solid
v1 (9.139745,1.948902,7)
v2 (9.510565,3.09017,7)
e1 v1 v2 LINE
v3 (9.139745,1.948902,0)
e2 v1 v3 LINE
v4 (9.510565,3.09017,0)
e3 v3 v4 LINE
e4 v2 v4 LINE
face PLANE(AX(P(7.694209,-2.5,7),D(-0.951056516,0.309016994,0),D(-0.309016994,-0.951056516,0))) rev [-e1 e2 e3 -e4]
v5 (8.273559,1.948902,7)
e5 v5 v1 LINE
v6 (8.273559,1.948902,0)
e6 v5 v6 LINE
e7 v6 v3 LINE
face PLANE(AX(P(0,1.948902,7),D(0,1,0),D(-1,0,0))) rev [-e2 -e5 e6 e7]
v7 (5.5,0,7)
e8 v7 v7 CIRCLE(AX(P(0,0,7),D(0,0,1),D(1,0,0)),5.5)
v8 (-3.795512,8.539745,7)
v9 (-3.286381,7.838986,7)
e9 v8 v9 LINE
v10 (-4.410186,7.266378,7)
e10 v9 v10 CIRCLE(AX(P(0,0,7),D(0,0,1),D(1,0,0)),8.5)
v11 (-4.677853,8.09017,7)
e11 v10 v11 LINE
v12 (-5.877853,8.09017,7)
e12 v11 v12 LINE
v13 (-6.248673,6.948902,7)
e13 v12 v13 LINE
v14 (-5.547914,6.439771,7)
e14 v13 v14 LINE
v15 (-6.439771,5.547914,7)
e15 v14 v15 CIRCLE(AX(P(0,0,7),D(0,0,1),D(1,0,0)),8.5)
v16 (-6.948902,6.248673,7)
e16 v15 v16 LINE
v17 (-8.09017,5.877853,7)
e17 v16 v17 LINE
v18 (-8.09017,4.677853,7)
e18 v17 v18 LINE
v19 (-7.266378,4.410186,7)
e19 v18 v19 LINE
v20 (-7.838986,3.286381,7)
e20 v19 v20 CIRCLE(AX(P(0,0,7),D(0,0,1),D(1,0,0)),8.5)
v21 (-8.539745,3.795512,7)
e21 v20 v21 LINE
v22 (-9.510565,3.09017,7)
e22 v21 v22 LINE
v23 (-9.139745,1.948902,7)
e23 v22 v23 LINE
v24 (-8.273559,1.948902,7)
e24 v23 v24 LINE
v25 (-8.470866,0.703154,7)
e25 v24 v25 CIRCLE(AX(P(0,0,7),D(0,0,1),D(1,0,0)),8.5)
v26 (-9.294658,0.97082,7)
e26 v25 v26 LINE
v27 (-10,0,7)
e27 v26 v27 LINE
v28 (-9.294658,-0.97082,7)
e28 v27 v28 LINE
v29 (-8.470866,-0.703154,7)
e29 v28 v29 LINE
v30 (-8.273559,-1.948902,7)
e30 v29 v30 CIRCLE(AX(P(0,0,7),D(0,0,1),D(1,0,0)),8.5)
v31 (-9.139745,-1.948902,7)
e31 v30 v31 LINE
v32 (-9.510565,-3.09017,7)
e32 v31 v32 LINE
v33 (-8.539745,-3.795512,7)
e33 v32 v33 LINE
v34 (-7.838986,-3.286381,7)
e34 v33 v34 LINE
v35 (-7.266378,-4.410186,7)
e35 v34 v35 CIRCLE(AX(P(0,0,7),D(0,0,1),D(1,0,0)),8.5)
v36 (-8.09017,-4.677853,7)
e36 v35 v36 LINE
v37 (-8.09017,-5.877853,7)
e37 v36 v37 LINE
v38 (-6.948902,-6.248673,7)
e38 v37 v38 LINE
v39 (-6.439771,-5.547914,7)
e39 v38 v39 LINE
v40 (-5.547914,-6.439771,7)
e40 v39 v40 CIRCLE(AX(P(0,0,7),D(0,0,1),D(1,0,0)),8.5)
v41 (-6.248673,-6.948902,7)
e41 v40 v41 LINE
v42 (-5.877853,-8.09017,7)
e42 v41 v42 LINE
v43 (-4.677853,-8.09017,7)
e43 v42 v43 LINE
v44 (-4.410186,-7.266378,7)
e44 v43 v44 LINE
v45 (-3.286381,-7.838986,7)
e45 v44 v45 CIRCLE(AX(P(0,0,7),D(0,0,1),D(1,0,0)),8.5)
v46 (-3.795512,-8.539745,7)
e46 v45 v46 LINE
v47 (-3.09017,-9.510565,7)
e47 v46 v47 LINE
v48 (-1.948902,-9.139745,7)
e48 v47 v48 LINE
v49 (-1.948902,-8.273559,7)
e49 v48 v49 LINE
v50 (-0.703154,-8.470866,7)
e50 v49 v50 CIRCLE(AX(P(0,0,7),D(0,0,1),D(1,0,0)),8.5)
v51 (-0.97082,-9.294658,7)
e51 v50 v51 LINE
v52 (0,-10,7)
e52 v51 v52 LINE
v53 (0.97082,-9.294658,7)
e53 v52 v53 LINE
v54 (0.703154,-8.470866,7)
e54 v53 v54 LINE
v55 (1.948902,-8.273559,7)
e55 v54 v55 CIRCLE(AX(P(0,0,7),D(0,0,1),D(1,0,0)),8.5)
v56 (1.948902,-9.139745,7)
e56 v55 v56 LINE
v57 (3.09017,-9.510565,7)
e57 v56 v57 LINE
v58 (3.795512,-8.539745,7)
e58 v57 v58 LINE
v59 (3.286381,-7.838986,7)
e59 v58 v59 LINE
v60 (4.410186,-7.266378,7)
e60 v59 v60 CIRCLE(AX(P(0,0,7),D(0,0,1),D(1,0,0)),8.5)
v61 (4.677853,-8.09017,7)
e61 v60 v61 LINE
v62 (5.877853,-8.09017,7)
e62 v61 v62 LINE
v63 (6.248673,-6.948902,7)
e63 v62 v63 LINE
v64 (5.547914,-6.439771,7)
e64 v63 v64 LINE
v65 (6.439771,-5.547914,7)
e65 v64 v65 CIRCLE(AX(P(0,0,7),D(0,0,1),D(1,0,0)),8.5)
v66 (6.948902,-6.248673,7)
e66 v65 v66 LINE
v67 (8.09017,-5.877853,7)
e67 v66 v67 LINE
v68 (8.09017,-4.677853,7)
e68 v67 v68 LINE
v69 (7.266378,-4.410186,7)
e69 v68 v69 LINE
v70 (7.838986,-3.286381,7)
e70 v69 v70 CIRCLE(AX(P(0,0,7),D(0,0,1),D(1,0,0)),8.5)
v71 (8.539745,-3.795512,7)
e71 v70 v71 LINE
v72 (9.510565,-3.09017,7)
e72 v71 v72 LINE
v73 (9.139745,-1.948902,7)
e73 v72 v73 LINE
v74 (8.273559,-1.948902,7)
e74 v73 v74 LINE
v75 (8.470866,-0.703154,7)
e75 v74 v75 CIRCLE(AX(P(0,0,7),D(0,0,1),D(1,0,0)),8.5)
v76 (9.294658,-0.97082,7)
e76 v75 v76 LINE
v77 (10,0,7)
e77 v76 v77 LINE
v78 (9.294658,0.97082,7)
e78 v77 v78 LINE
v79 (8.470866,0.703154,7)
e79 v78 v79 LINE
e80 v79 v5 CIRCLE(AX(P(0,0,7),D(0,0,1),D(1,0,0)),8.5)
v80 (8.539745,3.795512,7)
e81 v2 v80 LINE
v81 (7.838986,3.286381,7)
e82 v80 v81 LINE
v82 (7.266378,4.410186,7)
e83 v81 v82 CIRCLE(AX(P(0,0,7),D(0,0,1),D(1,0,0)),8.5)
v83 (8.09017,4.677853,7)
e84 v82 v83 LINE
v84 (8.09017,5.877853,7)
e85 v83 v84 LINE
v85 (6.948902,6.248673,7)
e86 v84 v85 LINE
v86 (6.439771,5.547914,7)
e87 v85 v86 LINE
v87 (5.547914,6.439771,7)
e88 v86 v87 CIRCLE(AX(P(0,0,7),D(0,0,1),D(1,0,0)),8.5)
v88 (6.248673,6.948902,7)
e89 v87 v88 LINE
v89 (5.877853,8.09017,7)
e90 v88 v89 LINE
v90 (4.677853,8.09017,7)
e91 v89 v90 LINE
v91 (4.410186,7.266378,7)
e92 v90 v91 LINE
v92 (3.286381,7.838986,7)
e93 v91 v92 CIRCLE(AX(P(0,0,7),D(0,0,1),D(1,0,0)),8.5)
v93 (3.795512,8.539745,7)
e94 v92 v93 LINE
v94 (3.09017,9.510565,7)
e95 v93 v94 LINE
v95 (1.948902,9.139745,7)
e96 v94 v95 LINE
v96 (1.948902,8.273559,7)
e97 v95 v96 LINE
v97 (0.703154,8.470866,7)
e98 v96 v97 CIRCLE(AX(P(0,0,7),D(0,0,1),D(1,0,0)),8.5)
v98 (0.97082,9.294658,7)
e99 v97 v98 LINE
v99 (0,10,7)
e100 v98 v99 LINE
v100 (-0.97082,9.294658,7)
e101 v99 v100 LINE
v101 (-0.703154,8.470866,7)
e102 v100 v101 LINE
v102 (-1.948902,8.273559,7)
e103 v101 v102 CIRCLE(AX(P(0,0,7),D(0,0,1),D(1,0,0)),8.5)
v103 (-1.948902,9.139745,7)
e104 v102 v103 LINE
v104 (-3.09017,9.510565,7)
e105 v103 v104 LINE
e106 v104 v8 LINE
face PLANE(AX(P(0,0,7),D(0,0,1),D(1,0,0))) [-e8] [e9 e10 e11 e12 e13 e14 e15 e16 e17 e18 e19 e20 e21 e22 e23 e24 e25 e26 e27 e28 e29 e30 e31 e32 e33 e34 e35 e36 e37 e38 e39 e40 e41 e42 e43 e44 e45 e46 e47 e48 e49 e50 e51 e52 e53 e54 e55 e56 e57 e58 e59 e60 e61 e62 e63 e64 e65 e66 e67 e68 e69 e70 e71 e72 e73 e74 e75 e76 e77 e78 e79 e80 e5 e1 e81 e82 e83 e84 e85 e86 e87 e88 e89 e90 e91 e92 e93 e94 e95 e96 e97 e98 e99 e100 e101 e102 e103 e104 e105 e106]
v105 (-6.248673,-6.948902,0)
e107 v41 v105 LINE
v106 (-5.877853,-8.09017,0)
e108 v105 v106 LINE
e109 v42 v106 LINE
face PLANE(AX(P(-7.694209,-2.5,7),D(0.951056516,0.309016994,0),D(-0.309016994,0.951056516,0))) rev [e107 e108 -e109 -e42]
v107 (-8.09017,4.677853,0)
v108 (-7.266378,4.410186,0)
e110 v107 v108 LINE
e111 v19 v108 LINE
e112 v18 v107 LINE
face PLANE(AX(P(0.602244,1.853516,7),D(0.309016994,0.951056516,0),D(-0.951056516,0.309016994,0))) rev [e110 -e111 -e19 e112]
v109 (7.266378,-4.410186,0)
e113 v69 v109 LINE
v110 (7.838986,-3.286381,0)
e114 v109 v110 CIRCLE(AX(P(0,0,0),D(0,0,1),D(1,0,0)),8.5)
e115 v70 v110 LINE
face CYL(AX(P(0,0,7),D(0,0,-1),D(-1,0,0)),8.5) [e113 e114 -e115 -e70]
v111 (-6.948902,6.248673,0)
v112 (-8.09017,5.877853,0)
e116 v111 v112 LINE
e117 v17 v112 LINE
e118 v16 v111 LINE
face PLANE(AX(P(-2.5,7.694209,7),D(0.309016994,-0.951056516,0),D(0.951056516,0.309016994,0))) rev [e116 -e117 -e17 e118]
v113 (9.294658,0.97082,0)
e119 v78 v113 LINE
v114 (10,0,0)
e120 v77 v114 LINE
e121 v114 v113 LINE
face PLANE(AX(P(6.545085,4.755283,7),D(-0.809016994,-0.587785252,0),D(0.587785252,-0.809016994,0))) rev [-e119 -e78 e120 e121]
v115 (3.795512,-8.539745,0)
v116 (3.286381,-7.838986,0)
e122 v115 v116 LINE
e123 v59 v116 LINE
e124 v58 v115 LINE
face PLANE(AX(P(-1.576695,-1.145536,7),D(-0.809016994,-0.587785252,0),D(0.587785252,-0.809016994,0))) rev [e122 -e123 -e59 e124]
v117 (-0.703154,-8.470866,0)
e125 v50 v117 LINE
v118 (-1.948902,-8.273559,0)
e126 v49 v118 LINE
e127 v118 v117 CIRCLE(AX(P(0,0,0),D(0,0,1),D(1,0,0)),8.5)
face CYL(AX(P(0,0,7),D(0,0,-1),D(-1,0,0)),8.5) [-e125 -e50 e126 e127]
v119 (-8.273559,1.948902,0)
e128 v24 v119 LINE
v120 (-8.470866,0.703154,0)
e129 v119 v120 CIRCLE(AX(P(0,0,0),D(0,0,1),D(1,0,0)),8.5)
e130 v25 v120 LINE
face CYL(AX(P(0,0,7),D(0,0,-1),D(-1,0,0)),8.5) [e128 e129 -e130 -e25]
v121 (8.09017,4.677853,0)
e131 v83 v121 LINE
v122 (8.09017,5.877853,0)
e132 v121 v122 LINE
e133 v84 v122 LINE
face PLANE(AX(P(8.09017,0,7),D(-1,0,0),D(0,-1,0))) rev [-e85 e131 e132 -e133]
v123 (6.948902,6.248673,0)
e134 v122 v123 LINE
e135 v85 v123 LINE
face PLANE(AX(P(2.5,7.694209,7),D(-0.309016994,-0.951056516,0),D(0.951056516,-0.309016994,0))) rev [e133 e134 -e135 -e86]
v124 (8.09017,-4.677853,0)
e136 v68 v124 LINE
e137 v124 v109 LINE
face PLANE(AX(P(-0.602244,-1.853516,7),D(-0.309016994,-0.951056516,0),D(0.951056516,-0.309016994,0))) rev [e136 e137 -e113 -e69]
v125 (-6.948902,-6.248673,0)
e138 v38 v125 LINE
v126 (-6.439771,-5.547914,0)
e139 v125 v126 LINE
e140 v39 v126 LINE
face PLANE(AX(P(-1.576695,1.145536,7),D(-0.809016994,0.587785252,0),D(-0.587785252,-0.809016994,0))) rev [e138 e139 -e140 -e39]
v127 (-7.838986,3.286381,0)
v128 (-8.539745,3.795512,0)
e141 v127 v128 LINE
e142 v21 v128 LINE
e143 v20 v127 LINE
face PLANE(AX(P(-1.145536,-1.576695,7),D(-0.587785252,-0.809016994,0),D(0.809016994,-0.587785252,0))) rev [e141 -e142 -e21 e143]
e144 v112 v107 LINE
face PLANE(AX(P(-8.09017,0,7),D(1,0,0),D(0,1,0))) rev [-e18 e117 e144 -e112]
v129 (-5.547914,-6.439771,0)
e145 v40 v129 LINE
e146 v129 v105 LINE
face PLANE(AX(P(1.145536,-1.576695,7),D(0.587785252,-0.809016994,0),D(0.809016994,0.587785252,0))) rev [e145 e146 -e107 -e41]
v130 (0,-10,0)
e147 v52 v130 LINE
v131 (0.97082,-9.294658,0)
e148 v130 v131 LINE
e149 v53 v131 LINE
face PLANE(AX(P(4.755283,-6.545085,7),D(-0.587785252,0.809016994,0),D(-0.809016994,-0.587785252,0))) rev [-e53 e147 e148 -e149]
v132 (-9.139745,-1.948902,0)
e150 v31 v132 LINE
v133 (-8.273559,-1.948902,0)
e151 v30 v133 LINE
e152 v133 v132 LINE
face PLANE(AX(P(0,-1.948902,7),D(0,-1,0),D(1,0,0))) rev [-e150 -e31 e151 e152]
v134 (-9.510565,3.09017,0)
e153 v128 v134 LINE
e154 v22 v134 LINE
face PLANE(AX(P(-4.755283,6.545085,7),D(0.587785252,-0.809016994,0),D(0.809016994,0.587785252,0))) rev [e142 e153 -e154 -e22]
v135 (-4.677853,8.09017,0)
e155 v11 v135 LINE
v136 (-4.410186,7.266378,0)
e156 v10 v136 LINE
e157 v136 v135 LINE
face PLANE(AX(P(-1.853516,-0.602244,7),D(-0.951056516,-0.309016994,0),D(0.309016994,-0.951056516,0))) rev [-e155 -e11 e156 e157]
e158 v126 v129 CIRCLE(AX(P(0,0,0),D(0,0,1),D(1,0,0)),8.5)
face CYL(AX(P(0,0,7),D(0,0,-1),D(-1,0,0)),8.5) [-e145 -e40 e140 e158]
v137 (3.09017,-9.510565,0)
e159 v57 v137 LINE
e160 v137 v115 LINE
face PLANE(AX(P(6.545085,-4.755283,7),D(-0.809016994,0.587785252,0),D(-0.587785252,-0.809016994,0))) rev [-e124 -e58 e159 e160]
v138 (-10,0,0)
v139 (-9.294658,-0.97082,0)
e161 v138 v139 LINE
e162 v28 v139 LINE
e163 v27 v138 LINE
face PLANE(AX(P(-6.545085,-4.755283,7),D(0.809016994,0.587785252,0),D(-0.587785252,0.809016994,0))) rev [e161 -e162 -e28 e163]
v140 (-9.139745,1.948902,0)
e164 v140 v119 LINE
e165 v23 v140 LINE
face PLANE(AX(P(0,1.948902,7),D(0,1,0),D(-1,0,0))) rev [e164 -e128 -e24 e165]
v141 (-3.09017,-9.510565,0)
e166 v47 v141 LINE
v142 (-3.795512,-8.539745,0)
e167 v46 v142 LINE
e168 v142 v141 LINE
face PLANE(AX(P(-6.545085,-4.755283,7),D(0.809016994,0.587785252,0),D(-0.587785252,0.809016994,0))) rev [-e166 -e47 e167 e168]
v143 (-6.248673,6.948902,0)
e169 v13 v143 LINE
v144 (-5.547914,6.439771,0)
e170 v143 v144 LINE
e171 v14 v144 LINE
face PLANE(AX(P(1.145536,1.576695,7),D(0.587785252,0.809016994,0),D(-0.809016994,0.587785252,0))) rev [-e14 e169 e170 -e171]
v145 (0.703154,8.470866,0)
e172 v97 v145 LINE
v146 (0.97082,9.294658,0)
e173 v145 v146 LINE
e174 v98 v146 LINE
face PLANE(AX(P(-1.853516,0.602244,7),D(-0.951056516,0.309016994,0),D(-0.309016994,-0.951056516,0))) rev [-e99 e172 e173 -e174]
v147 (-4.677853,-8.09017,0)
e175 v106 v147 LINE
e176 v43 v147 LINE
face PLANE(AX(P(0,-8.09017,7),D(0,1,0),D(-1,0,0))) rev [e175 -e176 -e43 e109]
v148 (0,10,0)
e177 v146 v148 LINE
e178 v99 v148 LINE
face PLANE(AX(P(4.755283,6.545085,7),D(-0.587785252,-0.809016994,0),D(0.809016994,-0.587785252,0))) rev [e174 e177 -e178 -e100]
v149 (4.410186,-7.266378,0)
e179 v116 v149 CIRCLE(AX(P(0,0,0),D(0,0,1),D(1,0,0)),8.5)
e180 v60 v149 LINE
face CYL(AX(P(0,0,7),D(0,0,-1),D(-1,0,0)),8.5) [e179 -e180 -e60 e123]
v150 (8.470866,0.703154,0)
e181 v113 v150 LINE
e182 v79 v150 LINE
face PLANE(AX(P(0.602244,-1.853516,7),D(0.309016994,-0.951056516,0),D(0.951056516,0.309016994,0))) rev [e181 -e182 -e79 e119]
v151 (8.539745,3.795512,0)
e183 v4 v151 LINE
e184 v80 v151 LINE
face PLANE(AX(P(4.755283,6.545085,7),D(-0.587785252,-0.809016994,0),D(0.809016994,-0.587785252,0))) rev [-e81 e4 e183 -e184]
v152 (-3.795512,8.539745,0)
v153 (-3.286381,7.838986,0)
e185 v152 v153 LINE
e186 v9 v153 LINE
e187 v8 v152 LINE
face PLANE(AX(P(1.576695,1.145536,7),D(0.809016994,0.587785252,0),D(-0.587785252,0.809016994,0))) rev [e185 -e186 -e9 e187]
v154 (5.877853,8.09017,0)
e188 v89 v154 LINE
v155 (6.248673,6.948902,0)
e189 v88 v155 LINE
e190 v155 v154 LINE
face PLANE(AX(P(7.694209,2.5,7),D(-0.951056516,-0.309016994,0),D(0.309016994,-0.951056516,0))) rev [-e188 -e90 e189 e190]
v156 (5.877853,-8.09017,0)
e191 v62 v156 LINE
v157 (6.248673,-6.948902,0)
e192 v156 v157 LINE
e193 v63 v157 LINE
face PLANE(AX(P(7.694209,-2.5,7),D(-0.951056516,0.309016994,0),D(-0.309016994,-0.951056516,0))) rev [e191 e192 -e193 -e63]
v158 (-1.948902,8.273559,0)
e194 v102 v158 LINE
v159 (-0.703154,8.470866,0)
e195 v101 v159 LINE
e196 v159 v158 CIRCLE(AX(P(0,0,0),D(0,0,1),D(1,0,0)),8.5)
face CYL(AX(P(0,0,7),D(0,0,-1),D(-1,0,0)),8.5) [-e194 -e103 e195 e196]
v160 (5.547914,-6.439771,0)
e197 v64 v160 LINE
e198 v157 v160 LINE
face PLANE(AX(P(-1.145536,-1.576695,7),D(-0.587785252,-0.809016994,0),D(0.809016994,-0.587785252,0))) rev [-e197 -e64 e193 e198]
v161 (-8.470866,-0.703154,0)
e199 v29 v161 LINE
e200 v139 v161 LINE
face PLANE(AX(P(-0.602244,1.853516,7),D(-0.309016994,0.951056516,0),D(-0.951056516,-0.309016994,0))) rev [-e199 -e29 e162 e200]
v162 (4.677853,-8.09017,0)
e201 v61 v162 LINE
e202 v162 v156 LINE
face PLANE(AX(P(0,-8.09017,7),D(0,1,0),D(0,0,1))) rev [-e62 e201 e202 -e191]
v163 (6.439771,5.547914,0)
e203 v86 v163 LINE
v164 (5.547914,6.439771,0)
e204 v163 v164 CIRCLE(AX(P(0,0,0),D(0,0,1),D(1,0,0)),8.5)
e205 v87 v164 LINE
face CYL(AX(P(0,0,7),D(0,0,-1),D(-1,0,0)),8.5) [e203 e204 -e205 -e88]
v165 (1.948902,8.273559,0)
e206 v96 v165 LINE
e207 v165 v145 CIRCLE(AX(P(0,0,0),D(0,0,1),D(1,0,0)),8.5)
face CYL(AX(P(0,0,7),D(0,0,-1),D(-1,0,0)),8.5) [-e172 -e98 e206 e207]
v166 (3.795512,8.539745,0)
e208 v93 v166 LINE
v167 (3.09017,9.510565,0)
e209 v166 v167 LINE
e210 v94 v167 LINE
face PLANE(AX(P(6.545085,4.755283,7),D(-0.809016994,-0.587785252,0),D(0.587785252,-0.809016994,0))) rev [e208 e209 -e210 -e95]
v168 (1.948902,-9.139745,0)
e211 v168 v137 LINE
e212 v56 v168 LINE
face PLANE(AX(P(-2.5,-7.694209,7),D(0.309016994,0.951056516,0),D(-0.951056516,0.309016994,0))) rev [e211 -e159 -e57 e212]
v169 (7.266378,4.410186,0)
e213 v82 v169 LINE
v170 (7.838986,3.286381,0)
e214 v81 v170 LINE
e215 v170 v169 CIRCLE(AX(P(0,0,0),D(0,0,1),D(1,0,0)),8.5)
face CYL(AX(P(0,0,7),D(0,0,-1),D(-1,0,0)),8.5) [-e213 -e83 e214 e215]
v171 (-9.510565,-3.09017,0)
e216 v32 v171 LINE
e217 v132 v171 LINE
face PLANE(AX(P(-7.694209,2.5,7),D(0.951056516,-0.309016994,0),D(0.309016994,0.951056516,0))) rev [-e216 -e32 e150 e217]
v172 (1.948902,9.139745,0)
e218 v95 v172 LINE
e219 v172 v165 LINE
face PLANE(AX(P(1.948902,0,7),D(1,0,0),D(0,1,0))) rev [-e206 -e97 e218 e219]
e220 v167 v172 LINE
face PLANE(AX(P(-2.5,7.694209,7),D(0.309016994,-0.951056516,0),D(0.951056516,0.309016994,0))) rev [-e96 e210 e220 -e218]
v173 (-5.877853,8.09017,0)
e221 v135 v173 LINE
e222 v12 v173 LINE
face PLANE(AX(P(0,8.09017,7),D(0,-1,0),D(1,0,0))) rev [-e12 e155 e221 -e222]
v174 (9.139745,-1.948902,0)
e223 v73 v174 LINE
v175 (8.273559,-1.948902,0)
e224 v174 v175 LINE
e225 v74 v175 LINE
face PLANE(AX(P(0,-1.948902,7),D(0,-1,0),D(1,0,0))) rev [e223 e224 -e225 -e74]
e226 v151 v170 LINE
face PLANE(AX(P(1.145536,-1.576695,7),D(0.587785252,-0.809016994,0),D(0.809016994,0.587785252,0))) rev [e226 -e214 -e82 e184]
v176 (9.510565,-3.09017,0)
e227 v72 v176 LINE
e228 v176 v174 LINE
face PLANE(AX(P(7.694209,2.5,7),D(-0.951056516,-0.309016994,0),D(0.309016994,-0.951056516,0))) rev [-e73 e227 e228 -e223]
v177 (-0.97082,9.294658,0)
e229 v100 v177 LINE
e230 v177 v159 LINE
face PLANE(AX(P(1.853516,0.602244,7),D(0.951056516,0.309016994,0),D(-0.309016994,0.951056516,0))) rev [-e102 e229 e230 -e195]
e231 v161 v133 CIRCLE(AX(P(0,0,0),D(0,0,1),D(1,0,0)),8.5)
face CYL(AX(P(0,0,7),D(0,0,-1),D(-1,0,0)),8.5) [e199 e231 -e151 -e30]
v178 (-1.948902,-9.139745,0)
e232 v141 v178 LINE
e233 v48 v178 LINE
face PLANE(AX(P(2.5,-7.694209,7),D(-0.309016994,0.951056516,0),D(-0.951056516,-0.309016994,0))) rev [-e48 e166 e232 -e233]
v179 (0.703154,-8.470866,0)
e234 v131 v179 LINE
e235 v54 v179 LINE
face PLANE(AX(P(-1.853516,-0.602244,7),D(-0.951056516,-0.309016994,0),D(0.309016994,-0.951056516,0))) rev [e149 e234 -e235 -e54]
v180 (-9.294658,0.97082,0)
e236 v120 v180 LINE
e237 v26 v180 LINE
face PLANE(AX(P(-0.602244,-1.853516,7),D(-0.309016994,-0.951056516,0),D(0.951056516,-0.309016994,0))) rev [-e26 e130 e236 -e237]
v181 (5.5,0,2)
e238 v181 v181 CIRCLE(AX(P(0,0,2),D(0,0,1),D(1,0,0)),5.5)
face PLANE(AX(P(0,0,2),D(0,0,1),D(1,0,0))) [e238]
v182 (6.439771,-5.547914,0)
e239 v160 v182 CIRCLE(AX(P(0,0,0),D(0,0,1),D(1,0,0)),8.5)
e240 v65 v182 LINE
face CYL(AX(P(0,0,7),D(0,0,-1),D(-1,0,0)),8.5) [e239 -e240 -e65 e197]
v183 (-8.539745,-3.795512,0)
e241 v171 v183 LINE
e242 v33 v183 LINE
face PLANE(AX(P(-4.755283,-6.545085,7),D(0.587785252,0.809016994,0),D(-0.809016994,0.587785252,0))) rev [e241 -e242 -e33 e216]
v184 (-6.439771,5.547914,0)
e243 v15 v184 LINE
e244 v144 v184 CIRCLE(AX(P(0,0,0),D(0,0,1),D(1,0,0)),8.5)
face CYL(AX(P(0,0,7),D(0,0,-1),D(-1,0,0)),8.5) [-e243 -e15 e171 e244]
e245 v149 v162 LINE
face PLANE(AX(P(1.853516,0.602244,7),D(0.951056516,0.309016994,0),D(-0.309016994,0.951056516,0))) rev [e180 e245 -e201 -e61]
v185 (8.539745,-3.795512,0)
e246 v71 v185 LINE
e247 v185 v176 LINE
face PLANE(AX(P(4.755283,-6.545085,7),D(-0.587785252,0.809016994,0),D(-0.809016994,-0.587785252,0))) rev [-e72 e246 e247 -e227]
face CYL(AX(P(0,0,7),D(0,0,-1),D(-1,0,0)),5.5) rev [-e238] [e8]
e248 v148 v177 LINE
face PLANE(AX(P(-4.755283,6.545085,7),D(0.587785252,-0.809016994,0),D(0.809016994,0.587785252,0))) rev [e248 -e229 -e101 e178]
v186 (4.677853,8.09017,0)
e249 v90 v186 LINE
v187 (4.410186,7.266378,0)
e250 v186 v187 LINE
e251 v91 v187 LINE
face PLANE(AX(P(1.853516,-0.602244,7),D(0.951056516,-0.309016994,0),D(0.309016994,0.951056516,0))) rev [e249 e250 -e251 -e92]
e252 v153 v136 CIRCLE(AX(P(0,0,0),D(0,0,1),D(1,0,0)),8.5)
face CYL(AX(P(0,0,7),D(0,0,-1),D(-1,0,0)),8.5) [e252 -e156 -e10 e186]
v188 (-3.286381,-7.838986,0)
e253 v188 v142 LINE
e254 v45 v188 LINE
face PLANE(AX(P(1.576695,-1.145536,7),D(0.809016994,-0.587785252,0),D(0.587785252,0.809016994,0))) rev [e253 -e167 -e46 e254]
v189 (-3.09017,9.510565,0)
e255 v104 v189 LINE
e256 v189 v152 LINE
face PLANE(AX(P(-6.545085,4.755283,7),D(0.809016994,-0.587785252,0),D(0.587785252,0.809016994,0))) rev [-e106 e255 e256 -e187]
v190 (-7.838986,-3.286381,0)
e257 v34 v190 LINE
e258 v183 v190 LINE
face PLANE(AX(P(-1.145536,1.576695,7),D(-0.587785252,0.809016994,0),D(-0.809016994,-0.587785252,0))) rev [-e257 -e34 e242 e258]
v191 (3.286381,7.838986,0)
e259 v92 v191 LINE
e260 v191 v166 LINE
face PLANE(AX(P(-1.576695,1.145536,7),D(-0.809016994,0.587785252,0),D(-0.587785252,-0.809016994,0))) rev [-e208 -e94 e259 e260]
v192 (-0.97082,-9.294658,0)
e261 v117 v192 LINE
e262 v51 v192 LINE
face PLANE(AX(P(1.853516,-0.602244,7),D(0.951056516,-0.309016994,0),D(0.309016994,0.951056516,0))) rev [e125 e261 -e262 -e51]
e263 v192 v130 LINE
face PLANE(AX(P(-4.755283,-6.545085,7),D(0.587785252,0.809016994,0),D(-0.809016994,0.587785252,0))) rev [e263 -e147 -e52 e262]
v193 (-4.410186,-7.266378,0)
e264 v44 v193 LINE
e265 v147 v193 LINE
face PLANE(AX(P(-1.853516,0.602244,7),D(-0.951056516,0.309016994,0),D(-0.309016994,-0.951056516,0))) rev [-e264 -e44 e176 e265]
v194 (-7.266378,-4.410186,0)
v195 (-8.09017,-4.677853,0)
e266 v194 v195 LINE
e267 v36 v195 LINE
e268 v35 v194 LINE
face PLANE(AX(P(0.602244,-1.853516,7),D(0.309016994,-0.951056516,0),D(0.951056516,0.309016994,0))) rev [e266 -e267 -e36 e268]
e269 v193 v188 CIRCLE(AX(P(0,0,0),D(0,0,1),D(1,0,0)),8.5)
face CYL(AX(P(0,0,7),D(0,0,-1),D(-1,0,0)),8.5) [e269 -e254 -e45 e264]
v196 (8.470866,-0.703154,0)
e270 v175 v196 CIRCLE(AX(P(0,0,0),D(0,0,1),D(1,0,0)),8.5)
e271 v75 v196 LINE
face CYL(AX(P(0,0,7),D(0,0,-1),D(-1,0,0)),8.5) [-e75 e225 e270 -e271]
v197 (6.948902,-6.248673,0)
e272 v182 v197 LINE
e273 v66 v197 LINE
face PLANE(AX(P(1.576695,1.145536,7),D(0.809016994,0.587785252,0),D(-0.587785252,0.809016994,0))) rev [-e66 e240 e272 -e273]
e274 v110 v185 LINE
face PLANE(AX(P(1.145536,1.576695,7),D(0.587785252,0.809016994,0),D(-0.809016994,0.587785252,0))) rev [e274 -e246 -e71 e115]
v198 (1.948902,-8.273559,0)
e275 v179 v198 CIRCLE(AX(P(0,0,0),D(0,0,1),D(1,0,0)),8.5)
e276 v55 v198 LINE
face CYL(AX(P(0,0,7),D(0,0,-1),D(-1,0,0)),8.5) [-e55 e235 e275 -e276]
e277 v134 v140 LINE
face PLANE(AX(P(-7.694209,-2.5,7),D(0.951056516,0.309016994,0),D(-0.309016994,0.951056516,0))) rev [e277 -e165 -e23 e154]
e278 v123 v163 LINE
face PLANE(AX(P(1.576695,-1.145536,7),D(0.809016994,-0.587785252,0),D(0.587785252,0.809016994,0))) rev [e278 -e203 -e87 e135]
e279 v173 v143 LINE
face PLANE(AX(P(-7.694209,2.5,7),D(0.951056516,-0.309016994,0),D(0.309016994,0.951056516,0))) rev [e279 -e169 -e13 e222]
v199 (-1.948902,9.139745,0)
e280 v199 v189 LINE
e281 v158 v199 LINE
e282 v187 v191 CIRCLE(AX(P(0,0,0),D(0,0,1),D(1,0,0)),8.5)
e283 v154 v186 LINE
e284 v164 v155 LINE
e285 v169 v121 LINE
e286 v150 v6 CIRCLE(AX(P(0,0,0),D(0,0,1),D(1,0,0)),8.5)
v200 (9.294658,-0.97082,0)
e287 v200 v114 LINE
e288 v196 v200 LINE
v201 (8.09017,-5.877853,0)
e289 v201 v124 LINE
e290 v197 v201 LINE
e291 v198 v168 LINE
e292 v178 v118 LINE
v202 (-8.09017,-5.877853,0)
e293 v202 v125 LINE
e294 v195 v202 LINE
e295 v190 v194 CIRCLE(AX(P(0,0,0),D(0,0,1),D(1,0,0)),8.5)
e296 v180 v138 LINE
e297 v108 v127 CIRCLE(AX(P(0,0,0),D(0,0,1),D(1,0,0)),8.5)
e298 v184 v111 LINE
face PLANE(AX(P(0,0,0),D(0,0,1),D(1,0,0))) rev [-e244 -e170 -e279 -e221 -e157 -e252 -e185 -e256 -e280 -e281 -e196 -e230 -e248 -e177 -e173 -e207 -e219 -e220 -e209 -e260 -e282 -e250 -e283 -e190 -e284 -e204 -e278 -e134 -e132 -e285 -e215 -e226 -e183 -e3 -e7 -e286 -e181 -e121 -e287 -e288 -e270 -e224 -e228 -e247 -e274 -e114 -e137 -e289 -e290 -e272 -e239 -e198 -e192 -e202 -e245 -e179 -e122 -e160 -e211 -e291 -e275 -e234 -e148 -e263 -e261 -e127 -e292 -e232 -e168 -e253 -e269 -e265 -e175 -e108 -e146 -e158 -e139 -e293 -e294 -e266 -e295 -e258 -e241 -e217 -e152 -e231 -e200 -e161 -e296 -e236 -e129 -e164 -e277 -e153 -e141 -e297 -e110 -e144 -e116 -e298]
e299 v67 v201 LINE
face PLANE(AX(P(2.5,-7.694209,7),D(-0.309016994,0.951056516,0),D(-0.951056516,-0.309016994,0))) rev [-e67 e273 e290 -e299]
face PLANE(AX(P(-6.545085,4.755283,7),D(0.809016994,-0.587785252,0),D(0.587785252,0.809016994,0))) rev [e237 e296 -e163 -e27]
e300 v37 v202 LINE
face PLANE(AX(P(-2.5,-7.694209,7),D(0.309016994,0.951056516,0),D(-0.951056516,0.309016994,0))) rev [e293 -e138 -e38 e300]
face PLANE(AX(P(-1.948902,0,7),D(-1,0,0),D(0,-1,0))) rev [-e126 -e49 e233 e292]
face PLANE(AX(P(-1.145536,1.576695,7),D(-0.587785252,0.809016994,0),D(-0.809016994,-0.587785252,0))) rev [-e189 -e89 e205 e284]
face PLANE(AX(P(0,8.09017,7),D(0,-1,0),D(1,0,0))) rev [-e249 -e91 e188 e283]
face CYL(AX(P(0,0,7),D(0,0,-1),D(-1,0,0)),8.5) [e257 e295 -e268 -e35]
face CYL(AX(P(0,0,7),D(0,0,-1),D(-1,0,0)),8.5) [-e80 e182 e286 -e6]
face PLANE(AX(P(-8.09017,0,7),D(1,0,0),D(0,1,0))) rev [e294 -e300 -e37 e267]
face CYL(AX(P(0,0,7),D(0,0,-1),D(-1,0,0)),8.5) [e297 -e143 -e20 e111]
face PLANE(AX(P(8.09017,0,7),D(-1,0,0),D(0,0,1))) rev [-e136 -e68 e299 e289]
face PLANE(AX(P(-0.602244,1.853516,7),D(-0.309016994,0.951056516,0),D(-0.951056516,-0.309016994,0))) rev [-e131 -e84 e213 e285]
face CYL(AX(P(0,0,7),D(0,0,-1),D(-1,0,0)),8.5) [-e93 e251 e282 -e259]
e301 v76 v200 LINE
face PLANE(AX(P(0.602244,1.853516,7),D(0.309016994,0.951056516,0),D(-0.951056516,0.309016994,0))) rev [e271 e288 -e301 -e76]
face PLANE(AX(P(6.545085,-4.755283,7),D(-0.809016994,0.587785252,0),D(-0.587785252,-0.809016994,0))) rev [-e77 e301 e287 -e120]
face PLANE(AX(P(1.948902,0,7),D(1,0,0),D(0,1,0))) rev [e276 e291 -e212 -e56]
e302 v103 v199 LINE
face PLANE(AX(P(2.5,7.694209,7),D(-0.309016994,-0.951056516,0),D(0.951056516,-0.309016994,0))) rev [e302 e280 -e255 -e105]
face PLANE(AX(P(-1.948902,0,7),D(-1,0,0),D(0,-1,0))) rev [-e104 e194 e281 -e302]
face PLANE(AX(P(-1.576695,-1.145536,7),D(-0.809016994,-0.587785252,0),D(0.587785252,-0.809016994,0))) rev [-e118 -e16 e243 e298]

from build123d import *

# Parameters (mm, degrees)
BOSS_EXTRUDE1_OUTLINE_R = 5.5
BOSS_EXTRUDE1_DEPTH     = 7
SKETCH1_3_R             = 5.5
BOSS_EXTRUDE2_DEPTH     = 2


# Read off the part's stored shape, not the designer's step: Boss-Extrude1
with BuildPart() as part:
    # Boss-Extrude1 outline → Boss-Extrude1 (new body)
    with BuildSketch(Plane.XY):
        with BuildLine():
            Line((-0.970820393, 9.294657697), (-0.703154307, 8.470866191))
            ThreePointArc((-0.703154307, 8.470866191), (-1.329692953, 8.395350895), (-1.948902124, 8.27355912))
            Line((-1.948902124, 8.27355912), (-1.948902124, 9.13974477))
            Line((-1.948902124, 9.13974477), (-3.090169944, 9.510565163))
            Line((-3.090169944, 9.510565163), (-3.795512247, 8.53974477))
            Line((-3.795512247, 8.53974477), (-3.286381096, 7.838985859))
            ThreePointArc((-3.286381096, 7.838985859), (-3.858919248, 7.573555456), (-4.410186437, 7.266378437))
            Line((-4.410186437, 7.266378437), (-4.677852523, 8.090169944))
            Line((-4.677852523, 8.090169944), (-5.877852523, 8.090169944))
            Line((-5.877852523, 8.090169944), (-6.248672916, 6.948902124))
            Line((-6.248672916, 6.948902124), (-5.547914005, 6.439770973))
            ThreePointArc((-5.547914005, 6.439770973), (-6.01040764, 6.01040764), (-6.439770973, 5.547914005))
            Line((-6.439770973, 5.547914005), (-6.948902124, 6.248672916))
            Line((-6.948902124, 6.248672916), (-8.090169944, 5.877852523))
            Line((-8.090169944, 5.877852523), (-8.090169944, 4.677852523))
            Line((-8.090169944, 4.677852523), (-7.266378437, 4.410186437))
            ThreePointArc((-7.266378437, 4.410186437), (-7.573555456, 3.858919248), (-7.838985859, 3.286381096))
            Line((-7.838985859, 3.286381096), (-8.53974477, 3.795512246))
            Line((-8.53974477, 3.795512246), (-9.510565163, 3.090169944))
            Line((-9.510565163, 3.090169944), (-9.13974477, 1.948902124))
            Line((-9.13974477, 1.948902124), (-8.27355912, 1.948902124))
            ThreePointArc((-8.27355912, 1.948902124), (-8.395350895, 1.329692953), (-8.470866191, 0.703154307))
            Line((-8.470866191, 0.703154307), (-9.294657697, 0.970820393))
            Line((-9.294657697, 0.970820393), (-10, 0))
            Line((-10, 0), (-9.294657697, -0.970820393))
            Line((-9.294657697, -0.970820393), (-8.470866191, -0.703154307))
            ThreePointArc((-8.470866191, -0.703154307), (-8.395350895, -1.329692953), (-8.27355912, -1.948902124))
            Line((-8.27355912, -1.948902124), (-9.13974477, -1.948902124))
            Line((-9.13974477, -1.948902124), (-9.510565163, -3.090169944))
            Line((-9.510565163, -3.090169944), (-8.53974477, -3.795512247))
            Line((-8.53974477, -3.795512247), (-7.838985859, -3.286381096))
            ThreePointArc((-7.838985859, -3.286381096), (-7.573555456, -3.858919248), (-7.266378437, -4.410186437))
            Line((-7.266378437, -4.410186437), (-8.090169944, -4.677852523))
            Line((-8.090169944, -4.677852523), (-8.090169944, -5.877852523))
            Line((-8.090169944, -5.877852523), (-6.948902124, -6.248672916))
            Line((-6.948902124, -6.248672916), (-6.439770973, -5.547914005))
            ThreePointArc((-6.439770973, -5.547914005), (-6.01040764, -6.01040764), (-5.547914005, -6.439770973))
            Line((-5.547914005, -6.439770973), (-6.248672916, -6.948902124))
            Line((-6.248672916, -6.948902124), (-5.877852523, -8.090169944))
            Line((-5.877852523, -8.090169944), (-4.677852523, -8.090169944))
            Line((-4.677852523, -8.090169944), (-4.410186437, -7.266378437))
            ThreePointArc((-4.410186437, -7.266378437), (-3.858919248, -7.573555456), (-3.286381096, -7.838985859))
            Line((-3.286381096, -7.838985859), (-3.795512246, -8.53974477))
            Line((-3.795512246, -8.53974477), (-3.090169944, -9.510565163))
            Line((-3.090169944, -9.510565163), (-1.948902124, -9.13974477))
            Line((-1.948902124, -9.13974477), (-1.948902124, -8.27355912))
            ThreePointArc((-1.948902124, -8.27355912), (-1.329692953, -8.395350895), (-0.703154307, -8.470866191))
            Line((-0.703154307, -8.470866191), (-0.970820393, -9.294657697))
            Line((-0.970820393, -9.294657697), (0, -10))
            Line((0, -10), (0.970820393, -9.294657697))
            Line((0.970820393, -9.294657697), (0.703154307, -8.470866191))
            ThreePointArc((0.703154307, -8.470866191), (1.329692953, -8.395350895), (1.948902124, -8.27355912))
            Line((1.948902124, -8.27355912), (1.948902124, -9.13974477))
            Line((1.948902124, -9.13974477), (3.090169944, -9.510565163))
            Line((3.090169944, -9.510565163), (3.795512247, -8.53974477))
            Line((3.795512247, -8.53974477), (3.286381096, -7.838985859))
            ThreePointArc((3.286381096, -7.838985859), (3.858919248, -7.573555456), (4.410186437, -7.266378437))
            Line((4.410186437, -7.266378437), (4.677852523, -8.090169944))
            Line((4.677852523, -8.090169944), (5.877852523, -8.090169944))
            Line((5.877852523, -8.090169944), (6.248672916, -6.948902124))
            Line((6.248672916, -6.948902124), (5.547914005, -6.439770973))
            ThreePointArc((5.547914005, -6.439770973), (6.01040764, -6.01040764), (6.439770973, -5.547914005))
            Line((6.439770973, -5.547914005), (6.948902124, -6.248672916))
            Line((6.948902124, -6.248672916), (8.090169944, -5.877852523))
            Line((8.090169944, -5.877852523), (8.090169944, -4.677852523))
            Line((8.090169944, -4.677852523), (7.266378437, -4.410186437))
            ThreePointArc((7.266378437, -4.410186437), (7.573555456, -3.858919248), (7.838985859, -3.286381096))
            Line((7.838985859, -3.286381096), (8.53974477, -3.795512246))
            Line((8.53974477, -3.795512246), (9.510565163, -3.090169944))
            Line((9.510565163, -3.090169944), (9.13974477, -1.948902124))
            Line((9.13974477, -1.948902124), (8.27355912, -1.948902124))
            ThreePointArc((8.27355912, -1.948902124), (8.395350895, -1.329692953), (8.470866191, -0.703154307))
            Line((8.470866191, -0.703154307), (9.294657697, -0.970820393))
            Line((9.294657697, -0.970820393), (10, 0))
            Line((10, 0), (9.294657697, 0.970820393))
            Line((9.294657697, 0.970820393), (8.470866191, 0.703154307))
            ThreePointArc((8.470866191, 0.703154307), (8.395350895, 1.329692953), (8.27355912, 1.948902124))
            Line((8.27355912, 1.948902124), (9.13974477, 1.948902124))
            Line((9.13974477, 1.948902124), (9.510565163, 3.090169944))
            Line((9.510565163, 3.090169944), (8.53974477, 3.795512247))
            Line((8.53974477, 3.795512247), (7.838985859, 3.286381096))
            ThreePointArc((7.838985859, 3.286381096), (7.573555456, 3.858919248), (7.266378437, 4.410186437))
            Line((7.266378437, 4.410186437), (8.090169944, 4.677852523))
            Line((8.090169944, 4.677852523), (8.090169944, 5.877852523))
            Line((8.090169944, 5.877852523), (6.948902124, 6.248672916))
            Line((6.948902124, 6.248672916), (6.439770973, 5.547914005))
            ThreePointArc((6.439770973, 5.547914005), (6.01040764, 6.01040764), (5.547914005, 6.439770973))
            Line((5.547914005, 6.439770973), (6.248672916, 6.948902124))
            Line((6.248672916, 6.948902124), (5.877852523, 8.090169944))
            Line((5.877852523, 8.090169944), (4.677852523, 8.090169944))
            Line((4.677852523, 8.090169944), (4.410186437, 7.266378437))
            ThreePointArc((4.410186437, 7.266378437), (3.858919248, 7.573555456), (3.286381096, 7.838985859))
            Line((3.286381096, 7.838985859), (3.795512247, 8.53974477))
            Line((3.795512247, 8.53974477), (3.090169944, 9.510565163))
            Line((3.090169944, 9.510565163), (1.948902124, 9.13974477))
            Line((1.948902124, 9.13974477), (1.948902124, 8.27355912))
            ThreePointArc((1.948902124, 8.27355912), (1.329692953, 8.395350895), (0.703154307, 8.470866191))
            Line((0.703154307, 8.470866191), (0.970820393, 9.294657697))
            Line((0.970820393, 9.294657697), (0, 10))
            Line((0, 10), (-0.970820393, 9.294657697))
        make_face()
        Circle(BOSS_EXTRUDE1_OUTLINE_R, mode=Mode.SUBTRACT)
    extrude(amount=BOSS_EXTRUDE1_DEPTH)

    # Sketch1<3> → Boss-Extrude2 (add)
    with BuildSketch(Plane.XY):
        Circle(SKETCH1_3_R)
    extrude(amount=BOSS_EXTRUDE2_DEPTH)


solid = part.part
